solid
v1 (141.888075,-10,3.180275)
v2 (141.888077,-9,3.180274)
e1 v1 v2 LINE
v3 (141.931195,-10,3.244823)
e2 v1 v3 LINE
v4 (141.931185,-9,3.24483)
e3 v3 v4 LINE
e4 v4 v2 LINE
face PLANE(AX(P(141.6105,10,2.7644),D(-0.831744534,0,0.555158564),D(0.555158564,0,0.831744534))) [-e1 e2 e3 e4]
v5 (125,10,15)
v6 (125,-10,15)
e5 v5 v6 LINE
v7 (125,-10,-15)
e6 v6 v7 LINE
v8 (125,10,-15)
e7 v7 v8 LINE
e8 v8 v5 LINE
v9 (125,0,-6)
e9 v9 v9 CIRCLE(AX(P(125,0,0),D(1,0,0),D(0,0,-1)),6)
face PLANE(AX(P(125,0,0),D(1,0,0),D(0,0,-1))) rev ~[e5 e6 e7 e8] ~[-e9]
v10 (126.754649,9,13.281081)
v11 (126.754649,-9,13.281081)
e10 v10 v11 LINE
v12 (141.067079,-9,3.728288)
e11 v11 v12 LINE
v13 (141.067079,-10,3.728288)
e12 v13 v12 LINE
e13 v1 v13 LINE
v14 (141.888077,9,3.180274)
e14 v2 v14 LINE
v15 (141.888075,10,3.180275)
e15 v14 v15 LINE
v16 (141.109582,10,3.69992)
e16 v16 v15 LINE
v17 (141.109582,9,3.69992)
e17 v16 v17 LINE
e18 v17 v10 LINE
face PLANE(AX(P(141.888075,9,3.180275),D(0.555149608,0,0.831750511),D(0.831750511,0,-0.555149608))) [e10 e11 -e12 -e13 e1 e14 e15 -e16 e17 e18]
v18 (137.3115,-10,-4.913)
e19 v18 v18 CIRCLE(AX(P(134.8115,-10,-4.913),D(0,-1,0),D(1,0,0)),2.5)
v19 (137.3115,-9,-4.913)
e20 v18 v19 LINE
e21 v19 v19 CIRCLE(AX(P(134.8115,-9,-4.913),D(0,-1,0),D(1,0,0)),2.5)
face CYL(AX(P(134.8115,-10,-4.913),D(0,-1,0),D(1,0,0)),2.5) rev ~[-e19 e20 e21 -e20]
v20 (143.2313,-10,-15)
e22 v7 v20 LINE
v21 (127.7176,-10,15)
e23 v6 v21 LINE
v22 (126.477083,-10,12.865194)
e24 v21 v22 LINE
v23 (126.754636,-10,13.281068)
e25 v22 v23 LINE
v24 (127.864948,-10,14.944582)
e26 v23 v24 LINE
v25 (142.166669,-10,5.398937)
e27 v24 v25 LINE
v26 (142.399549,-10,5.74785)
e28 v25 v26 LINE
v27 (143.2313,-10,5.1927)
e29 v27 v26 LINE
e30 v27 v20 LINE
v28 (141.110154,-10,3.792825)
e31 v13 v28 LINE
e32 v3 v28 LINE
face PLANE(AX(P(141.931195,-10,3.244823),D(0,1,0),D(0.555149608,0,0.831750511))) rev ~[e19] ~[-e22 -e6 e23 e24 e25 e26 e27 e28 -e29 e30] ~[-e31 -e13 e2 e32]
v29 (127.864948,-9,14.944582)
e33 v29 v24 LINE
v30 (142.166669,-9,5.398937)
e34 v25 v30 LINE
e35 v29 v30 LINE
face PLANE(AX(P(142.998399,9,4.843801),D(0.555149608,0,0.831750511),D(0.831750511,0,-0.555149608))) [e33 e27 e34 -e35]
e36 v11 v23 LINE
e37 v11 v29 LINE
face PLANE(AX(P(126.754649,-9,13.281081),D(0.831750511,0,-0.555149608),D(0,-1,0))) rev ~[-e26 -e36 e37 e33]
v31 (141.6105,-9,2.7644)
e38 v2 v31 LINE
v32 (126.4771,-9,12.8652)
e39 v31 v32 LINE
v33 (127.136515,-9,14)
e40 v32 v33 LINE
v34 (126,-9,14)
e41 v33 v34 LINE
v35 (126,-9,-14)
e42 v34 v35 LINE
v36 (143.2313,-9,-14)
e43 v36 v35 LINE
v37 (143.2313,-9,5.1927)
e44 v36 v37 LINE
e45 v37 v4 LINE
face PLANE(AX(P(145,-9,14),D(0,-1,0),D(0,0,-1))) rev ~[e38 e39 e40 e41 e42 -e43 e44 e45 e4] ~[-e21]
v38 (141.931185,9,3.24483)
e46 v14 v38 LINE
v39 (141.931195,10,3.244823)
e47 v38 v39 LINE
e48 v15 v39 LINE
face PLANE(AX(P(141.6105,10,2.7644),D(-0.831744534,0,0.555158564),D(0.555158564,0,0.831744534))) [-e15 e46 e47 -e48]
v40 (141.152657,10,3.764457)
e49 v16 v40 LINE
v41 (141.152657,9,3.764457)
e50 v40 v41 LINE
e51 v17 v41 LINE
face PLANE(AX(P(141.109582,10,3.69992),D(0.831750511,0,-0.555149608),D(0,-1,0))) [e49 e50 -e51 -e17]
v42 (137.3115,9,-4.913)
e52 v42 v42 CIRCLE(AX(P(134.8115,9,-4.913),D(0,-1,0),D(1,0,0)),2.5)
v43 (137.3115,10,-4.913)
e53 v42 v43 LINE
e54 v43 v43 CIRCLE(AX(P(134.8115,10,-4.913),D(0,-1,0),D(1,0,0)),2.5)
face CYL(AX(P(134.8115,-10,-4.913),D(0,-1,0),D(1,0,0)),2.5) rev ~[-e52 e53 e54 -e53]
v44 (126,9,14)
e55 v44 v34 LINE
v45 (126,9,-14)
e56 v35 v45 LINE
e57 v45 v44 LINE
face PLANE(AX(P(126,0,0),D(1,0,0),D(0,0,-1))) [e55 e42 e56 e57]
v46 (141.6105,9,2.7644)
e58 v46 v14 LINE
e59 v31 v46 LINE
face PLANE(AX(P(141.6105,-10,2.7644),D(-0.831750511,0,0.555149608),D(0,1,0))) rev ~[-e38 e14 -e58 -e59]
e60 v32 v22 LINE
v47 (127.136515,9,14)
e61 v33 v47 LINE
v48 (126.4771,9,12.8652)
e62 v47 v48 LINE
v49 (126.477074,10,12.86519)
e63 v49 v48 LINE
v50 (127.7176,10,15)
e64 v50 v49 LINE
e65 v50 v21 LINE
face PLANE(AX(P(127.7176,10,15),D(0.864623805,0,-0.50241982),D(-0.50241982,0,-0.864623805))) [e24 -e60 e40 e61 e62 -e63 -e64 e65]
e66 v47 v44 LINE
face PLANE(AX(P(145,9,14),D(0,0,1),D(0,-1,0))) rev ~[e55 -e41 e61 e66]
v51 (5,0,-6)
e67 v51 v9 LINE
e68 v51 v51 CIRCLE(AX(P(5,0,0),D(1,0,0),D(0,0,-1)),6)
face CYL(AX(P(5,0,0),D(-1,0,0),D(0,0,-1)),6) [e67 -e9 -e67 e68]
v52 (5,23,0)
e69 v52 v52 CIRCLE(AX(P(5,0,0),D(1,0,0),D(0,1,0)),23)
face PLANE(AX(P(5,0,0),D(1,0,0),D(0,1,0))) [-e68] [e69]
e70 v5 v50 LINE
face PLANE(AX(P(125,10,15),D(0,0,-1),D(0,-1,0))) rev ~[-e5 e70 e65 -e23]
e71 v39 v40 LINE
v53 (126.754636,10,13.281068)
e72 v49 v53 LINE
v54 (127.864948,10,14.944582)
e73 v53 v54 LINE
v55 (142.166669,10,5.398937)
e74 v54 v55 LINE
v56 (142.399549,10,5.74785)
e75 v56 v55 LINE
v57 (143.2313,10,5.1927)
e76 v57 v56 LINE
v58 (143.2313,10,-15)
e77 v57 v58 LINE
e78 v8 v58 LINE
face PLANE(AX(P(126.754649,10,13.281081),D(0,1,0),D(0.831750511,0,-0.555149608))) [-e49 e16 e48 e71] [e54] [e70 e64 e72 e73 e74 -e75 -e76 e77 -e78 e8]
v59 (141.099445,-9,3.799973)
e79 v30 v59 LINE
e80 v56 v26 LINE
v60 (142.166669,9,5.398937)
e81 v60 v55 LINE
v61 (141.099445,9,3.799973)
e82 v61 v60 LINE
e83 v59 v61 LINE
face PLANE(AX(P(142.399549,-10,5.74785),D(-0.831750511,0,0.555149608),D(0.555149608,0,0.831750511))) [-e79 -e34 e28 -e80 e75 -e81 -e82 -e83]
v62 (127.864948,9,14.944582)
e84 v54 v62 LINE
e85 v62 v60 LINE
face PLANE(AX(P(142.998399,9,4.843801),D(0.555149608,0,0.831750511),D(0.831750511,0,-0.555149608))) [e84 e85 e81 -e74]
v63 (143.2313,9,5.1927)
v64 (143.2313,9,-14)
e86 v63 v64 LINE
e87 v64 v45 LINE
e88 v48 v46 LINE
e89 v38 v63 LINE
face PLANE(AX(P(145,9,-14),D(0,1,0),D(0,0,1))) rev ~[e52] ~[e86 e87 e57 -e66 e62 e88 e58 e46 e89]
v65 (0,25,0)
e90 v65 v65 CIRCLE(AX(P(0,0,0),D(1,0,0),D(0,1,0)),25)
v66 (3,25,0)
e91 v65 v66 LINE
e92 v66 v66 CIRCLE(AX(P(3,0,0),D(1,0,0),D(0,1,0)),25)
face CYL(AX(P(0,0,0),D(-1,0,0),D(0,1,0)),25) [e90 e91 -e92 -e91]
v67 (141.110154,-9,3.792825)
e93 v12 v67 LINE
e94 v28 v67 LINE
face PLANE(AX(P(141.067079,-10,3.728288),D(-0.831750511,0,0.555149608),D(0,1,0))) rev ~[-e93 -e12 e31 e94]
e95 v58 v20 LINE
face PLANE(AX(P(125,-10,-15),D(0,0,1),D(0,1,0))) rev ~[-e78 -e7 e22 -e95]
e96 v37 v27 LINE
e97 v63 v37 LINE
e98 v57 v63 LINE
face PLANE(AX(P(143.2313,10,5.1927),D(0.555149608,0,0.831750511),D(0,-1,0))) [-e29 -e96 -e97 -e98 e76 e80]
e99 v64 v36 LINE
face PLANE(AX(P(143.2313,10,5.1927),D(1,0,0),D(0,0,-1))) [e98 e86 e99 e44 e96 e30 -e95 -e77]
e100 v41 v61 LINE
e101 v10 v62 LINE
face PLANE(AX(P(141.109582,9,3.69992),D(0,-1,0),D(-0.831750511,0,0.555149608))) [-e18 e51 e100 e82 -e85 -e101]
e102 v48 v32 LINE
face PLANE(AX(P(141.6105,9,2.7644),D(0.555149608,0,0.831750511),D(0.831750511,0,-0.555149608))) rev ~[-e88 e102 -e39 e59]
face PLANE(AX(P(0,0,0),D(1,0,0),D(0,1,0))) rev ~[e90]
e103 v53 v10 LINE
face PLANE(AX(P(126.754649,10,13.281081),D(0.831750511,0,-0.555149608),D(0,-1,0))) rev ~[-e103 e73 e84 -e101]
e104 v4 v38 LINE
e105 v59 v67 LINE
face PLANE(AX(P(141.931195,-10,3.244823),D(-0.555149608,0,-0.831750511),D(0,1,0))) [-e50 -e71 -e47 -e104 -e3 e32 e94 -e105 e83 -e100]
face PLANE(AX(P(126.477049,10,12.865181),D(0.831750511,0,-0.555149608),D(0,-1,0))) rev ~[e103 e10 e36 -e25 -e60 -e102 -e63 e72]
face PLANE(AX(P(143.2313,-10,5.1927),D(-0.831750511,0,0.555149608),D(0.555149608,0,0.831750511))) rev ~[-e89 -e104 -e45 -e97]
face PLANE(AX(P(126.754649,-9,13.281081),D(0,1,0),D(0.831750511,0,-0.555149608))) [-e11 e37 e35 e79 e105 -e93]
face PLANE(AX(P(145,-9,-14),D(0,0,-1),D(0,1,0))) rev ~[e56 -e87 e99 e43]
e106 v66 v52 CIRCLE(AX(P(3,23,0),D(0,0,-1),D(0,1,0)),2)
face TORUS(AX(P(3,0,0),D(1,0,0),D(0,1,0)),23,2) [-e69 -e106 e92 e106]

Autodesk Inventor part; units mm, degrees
ref_plane "YZ Plane" through (0, 0, 0) normal (1, 0, 0) x (0, 1, 0)
ref_plane "XZ Plane" through (0, 0, 0) normal (0, 1, 0) x (-1, 0, 0)
ref_plane "XY Plane" through (0, 0, 0) normal (0, 0, 1) x (1, 0, 0)
sketch "Sketch1" plane through (0, 0, 0) normal (1, 0, 0) x (0, 1, 0)
  circle A0 centre (0, 0) radius 25
  dimension "d0" = 50
extrude "Extrusion1" add sketch "Sketch1" along normal blind 5
fillet "Fillet1" radius 2 1 edges at (5, -25, 0)
sketch "Sketch2" plane through (5, 0, 0) normal (1, 0, 0) x (0, 0, -1)
  circle A0 centre (0, 0) radius 6
  dimension "d4" = 12
extrude "Extrusion2" add sketch "Sketch2" along normal blind 120
sketch "Sketch3" plane through (125, 0, 0) normal (1, 0, 0) x (0, 0, -1)
  line L0 (15, 10) -> (-15, 10)
  line L1 (-15, 10) -> (-15, -10)
  line L2 (-15, -10) -> (15, -10)
  line L3 (15, -10) -> (15, 10)
  point P0 (0, 0)
  dimension "d7" = 20
  dimension "d8" = 30
  dimension "d9" = 15
  dimension "d10" = 10
extrude "Extrusion3" add sketch "Sketch3" along normal blind 20
sketch "Sketch4" plane through (145, 0, 0) normal (1, 0, 0) x (0, 0, -1)
  line L0 (-14, -9) -> (14, -9)
  line L1 (14, -9) -> (14, 9)
  line L2 (14, 9) -> (-14, 9)
  line L3 (-14, 9) -> (-14, -9)
  line L4 (-15, -10) -> (15, -10) projected
  line L5 (15, -10) -> (15, 10) projected
  point P0 (0, 0)
  dimension "d13" = 28
  dimension "d14" = 18
  dimension "d15" = 1
  dimension "d16" = 1
extrude "Extrusion4" cut sketch "Sketch4" against normal blind 19
sketch "Sketch5" plane through (125, 10, 15) normal (0, 1, 0) x (1, 0, 0)
  line L0 (0, 0) -> (20, 0) projected
  line L1 (2.7176, 0) -> (1.4771, 2.1348)
  line L2 (1.4771, 2.1348) -> (16.6105, 12.2356)
  line L3 (16.6105, 12.2356) -> (18.2313, 9.8073)
  line L4 (18.2313, 9.8073) -> (18.2313, 30)
  line L5 (0, 30) -> (20, 30) projected
  line L6 (20, 30) -> (20, 0) projected
  line L7 (20, 30) -> (20, 0)
  line L8 (20, 0) -> (2.7176, 0)
  point P0 (-125, 15)
extrude "Extrusion5" cut sketch "Sketch5" against normal blind 30
sketch "Sketch6" plane through (141.6105, 9, 2.7644) normal (0.5551496, 0, 0.8317505) x (0.8317505, 0, -0.5551496)
  line L0 (-18.1947, 1) -> (0, 1) projected
  line L1 (0, -19) -> (-18.1947, -19) projected
  line L2 (0, 1) -> (-18.1947, 1)
  line L3 (-18.1947, 1) -> (-18.1947, -19)
  line L4 (-18.1947, -19) -> (0, -19)
  line L5 (0, -19) -> (0, 1)
  point P0 (-116.25, -9)
extrude "Extrusion6" add sketch "Sketch6" along normal blind 0.5
sketch "Sketch7" plane through (125, -10, -15) normal (0, -1, 0) x (1, 0, 0)
  circle A0 centre (9.8115, 10.087) radius 2.5
  point P0 (-125, 15)
  dimension "d23" = 5
extrude "Extrusion7" cut sketch "Sketch7" against normal blind 25
sketch "Sketch8" plane through (143.2313, -10, 5.1927) normal (-0.8317505, 0, 0.5551496) x (0.5551496, 0, 0.8317505)
  line L0 (-16.7953, 0) -> (0, 0) projected
  line L1 (0, 20) -> (-16.7953, 20) projected
  line L2 (0, 0) -> (-2.3419, 0)
  line L3 (-2.3419, 0) -> (-2.3419, 20)
  line L4 (-2.3419, 20) -> (0, 20)
  line L5 (0, 20) -> (0, 0)
  point P0 (-83.8338, 10)
  point P1 (-2.3419, 0)
extrude "Extrusion8" add sketch "Sketch8" along normal blind 1
sketch "Sketch9" plane through (141.8881, 9, 3.1803) normal (0.5551496, 0, 0.8317505) x (0.8317505, 0, -0.5551496)
  line L0 (-18.1947, -19) -> (-18.3481, -19) projected
  line L1 (-18.1947, -18) -> (0, -18) projected
  line L2 (-18.1947, -19) -> (-0.9871, -19)
  line L3 (-0.9871, -19) -> (-0.9871, -18)
  line L4 (-0.9871, -18) -> (-18.1947, -18)
  line L5 (-18.1947, -18) -> (-18.1947, -19)
  point P0 (-116.25, -9)
  point P1 (-18.1947, -18)
extrude "Extrusion9" add sketch "Sketch9" along normal blind 2
sketch "Sketch10" plane through (141.8881, 9, 3.1803) normal (0.5551496, 0, 0.8317505) x (0.8317505, 0, -0.5551496)
  line L0 (-18.1947, 1) -> (-18.1947, -18) projected
  line L1 (1.107, 0) -> (-3.893, 0) projected
  line L2 (-18.1947, 1) -> (-0.936, 1)
  line L3 (-0.936, 1) -> (-0.936, 0)
  line L4 (-0.936, 0) -> (-18.1947, 0)
  line L5 (-18.1947, 0) -> (-18.1947, 1)
  point P0 (-116.25, -9)
  point P1 (-3.893, 0)
extrude "Extrusion10" add sketch "Sketch10" along normal blind 2
properties part number "مهمه 4"
